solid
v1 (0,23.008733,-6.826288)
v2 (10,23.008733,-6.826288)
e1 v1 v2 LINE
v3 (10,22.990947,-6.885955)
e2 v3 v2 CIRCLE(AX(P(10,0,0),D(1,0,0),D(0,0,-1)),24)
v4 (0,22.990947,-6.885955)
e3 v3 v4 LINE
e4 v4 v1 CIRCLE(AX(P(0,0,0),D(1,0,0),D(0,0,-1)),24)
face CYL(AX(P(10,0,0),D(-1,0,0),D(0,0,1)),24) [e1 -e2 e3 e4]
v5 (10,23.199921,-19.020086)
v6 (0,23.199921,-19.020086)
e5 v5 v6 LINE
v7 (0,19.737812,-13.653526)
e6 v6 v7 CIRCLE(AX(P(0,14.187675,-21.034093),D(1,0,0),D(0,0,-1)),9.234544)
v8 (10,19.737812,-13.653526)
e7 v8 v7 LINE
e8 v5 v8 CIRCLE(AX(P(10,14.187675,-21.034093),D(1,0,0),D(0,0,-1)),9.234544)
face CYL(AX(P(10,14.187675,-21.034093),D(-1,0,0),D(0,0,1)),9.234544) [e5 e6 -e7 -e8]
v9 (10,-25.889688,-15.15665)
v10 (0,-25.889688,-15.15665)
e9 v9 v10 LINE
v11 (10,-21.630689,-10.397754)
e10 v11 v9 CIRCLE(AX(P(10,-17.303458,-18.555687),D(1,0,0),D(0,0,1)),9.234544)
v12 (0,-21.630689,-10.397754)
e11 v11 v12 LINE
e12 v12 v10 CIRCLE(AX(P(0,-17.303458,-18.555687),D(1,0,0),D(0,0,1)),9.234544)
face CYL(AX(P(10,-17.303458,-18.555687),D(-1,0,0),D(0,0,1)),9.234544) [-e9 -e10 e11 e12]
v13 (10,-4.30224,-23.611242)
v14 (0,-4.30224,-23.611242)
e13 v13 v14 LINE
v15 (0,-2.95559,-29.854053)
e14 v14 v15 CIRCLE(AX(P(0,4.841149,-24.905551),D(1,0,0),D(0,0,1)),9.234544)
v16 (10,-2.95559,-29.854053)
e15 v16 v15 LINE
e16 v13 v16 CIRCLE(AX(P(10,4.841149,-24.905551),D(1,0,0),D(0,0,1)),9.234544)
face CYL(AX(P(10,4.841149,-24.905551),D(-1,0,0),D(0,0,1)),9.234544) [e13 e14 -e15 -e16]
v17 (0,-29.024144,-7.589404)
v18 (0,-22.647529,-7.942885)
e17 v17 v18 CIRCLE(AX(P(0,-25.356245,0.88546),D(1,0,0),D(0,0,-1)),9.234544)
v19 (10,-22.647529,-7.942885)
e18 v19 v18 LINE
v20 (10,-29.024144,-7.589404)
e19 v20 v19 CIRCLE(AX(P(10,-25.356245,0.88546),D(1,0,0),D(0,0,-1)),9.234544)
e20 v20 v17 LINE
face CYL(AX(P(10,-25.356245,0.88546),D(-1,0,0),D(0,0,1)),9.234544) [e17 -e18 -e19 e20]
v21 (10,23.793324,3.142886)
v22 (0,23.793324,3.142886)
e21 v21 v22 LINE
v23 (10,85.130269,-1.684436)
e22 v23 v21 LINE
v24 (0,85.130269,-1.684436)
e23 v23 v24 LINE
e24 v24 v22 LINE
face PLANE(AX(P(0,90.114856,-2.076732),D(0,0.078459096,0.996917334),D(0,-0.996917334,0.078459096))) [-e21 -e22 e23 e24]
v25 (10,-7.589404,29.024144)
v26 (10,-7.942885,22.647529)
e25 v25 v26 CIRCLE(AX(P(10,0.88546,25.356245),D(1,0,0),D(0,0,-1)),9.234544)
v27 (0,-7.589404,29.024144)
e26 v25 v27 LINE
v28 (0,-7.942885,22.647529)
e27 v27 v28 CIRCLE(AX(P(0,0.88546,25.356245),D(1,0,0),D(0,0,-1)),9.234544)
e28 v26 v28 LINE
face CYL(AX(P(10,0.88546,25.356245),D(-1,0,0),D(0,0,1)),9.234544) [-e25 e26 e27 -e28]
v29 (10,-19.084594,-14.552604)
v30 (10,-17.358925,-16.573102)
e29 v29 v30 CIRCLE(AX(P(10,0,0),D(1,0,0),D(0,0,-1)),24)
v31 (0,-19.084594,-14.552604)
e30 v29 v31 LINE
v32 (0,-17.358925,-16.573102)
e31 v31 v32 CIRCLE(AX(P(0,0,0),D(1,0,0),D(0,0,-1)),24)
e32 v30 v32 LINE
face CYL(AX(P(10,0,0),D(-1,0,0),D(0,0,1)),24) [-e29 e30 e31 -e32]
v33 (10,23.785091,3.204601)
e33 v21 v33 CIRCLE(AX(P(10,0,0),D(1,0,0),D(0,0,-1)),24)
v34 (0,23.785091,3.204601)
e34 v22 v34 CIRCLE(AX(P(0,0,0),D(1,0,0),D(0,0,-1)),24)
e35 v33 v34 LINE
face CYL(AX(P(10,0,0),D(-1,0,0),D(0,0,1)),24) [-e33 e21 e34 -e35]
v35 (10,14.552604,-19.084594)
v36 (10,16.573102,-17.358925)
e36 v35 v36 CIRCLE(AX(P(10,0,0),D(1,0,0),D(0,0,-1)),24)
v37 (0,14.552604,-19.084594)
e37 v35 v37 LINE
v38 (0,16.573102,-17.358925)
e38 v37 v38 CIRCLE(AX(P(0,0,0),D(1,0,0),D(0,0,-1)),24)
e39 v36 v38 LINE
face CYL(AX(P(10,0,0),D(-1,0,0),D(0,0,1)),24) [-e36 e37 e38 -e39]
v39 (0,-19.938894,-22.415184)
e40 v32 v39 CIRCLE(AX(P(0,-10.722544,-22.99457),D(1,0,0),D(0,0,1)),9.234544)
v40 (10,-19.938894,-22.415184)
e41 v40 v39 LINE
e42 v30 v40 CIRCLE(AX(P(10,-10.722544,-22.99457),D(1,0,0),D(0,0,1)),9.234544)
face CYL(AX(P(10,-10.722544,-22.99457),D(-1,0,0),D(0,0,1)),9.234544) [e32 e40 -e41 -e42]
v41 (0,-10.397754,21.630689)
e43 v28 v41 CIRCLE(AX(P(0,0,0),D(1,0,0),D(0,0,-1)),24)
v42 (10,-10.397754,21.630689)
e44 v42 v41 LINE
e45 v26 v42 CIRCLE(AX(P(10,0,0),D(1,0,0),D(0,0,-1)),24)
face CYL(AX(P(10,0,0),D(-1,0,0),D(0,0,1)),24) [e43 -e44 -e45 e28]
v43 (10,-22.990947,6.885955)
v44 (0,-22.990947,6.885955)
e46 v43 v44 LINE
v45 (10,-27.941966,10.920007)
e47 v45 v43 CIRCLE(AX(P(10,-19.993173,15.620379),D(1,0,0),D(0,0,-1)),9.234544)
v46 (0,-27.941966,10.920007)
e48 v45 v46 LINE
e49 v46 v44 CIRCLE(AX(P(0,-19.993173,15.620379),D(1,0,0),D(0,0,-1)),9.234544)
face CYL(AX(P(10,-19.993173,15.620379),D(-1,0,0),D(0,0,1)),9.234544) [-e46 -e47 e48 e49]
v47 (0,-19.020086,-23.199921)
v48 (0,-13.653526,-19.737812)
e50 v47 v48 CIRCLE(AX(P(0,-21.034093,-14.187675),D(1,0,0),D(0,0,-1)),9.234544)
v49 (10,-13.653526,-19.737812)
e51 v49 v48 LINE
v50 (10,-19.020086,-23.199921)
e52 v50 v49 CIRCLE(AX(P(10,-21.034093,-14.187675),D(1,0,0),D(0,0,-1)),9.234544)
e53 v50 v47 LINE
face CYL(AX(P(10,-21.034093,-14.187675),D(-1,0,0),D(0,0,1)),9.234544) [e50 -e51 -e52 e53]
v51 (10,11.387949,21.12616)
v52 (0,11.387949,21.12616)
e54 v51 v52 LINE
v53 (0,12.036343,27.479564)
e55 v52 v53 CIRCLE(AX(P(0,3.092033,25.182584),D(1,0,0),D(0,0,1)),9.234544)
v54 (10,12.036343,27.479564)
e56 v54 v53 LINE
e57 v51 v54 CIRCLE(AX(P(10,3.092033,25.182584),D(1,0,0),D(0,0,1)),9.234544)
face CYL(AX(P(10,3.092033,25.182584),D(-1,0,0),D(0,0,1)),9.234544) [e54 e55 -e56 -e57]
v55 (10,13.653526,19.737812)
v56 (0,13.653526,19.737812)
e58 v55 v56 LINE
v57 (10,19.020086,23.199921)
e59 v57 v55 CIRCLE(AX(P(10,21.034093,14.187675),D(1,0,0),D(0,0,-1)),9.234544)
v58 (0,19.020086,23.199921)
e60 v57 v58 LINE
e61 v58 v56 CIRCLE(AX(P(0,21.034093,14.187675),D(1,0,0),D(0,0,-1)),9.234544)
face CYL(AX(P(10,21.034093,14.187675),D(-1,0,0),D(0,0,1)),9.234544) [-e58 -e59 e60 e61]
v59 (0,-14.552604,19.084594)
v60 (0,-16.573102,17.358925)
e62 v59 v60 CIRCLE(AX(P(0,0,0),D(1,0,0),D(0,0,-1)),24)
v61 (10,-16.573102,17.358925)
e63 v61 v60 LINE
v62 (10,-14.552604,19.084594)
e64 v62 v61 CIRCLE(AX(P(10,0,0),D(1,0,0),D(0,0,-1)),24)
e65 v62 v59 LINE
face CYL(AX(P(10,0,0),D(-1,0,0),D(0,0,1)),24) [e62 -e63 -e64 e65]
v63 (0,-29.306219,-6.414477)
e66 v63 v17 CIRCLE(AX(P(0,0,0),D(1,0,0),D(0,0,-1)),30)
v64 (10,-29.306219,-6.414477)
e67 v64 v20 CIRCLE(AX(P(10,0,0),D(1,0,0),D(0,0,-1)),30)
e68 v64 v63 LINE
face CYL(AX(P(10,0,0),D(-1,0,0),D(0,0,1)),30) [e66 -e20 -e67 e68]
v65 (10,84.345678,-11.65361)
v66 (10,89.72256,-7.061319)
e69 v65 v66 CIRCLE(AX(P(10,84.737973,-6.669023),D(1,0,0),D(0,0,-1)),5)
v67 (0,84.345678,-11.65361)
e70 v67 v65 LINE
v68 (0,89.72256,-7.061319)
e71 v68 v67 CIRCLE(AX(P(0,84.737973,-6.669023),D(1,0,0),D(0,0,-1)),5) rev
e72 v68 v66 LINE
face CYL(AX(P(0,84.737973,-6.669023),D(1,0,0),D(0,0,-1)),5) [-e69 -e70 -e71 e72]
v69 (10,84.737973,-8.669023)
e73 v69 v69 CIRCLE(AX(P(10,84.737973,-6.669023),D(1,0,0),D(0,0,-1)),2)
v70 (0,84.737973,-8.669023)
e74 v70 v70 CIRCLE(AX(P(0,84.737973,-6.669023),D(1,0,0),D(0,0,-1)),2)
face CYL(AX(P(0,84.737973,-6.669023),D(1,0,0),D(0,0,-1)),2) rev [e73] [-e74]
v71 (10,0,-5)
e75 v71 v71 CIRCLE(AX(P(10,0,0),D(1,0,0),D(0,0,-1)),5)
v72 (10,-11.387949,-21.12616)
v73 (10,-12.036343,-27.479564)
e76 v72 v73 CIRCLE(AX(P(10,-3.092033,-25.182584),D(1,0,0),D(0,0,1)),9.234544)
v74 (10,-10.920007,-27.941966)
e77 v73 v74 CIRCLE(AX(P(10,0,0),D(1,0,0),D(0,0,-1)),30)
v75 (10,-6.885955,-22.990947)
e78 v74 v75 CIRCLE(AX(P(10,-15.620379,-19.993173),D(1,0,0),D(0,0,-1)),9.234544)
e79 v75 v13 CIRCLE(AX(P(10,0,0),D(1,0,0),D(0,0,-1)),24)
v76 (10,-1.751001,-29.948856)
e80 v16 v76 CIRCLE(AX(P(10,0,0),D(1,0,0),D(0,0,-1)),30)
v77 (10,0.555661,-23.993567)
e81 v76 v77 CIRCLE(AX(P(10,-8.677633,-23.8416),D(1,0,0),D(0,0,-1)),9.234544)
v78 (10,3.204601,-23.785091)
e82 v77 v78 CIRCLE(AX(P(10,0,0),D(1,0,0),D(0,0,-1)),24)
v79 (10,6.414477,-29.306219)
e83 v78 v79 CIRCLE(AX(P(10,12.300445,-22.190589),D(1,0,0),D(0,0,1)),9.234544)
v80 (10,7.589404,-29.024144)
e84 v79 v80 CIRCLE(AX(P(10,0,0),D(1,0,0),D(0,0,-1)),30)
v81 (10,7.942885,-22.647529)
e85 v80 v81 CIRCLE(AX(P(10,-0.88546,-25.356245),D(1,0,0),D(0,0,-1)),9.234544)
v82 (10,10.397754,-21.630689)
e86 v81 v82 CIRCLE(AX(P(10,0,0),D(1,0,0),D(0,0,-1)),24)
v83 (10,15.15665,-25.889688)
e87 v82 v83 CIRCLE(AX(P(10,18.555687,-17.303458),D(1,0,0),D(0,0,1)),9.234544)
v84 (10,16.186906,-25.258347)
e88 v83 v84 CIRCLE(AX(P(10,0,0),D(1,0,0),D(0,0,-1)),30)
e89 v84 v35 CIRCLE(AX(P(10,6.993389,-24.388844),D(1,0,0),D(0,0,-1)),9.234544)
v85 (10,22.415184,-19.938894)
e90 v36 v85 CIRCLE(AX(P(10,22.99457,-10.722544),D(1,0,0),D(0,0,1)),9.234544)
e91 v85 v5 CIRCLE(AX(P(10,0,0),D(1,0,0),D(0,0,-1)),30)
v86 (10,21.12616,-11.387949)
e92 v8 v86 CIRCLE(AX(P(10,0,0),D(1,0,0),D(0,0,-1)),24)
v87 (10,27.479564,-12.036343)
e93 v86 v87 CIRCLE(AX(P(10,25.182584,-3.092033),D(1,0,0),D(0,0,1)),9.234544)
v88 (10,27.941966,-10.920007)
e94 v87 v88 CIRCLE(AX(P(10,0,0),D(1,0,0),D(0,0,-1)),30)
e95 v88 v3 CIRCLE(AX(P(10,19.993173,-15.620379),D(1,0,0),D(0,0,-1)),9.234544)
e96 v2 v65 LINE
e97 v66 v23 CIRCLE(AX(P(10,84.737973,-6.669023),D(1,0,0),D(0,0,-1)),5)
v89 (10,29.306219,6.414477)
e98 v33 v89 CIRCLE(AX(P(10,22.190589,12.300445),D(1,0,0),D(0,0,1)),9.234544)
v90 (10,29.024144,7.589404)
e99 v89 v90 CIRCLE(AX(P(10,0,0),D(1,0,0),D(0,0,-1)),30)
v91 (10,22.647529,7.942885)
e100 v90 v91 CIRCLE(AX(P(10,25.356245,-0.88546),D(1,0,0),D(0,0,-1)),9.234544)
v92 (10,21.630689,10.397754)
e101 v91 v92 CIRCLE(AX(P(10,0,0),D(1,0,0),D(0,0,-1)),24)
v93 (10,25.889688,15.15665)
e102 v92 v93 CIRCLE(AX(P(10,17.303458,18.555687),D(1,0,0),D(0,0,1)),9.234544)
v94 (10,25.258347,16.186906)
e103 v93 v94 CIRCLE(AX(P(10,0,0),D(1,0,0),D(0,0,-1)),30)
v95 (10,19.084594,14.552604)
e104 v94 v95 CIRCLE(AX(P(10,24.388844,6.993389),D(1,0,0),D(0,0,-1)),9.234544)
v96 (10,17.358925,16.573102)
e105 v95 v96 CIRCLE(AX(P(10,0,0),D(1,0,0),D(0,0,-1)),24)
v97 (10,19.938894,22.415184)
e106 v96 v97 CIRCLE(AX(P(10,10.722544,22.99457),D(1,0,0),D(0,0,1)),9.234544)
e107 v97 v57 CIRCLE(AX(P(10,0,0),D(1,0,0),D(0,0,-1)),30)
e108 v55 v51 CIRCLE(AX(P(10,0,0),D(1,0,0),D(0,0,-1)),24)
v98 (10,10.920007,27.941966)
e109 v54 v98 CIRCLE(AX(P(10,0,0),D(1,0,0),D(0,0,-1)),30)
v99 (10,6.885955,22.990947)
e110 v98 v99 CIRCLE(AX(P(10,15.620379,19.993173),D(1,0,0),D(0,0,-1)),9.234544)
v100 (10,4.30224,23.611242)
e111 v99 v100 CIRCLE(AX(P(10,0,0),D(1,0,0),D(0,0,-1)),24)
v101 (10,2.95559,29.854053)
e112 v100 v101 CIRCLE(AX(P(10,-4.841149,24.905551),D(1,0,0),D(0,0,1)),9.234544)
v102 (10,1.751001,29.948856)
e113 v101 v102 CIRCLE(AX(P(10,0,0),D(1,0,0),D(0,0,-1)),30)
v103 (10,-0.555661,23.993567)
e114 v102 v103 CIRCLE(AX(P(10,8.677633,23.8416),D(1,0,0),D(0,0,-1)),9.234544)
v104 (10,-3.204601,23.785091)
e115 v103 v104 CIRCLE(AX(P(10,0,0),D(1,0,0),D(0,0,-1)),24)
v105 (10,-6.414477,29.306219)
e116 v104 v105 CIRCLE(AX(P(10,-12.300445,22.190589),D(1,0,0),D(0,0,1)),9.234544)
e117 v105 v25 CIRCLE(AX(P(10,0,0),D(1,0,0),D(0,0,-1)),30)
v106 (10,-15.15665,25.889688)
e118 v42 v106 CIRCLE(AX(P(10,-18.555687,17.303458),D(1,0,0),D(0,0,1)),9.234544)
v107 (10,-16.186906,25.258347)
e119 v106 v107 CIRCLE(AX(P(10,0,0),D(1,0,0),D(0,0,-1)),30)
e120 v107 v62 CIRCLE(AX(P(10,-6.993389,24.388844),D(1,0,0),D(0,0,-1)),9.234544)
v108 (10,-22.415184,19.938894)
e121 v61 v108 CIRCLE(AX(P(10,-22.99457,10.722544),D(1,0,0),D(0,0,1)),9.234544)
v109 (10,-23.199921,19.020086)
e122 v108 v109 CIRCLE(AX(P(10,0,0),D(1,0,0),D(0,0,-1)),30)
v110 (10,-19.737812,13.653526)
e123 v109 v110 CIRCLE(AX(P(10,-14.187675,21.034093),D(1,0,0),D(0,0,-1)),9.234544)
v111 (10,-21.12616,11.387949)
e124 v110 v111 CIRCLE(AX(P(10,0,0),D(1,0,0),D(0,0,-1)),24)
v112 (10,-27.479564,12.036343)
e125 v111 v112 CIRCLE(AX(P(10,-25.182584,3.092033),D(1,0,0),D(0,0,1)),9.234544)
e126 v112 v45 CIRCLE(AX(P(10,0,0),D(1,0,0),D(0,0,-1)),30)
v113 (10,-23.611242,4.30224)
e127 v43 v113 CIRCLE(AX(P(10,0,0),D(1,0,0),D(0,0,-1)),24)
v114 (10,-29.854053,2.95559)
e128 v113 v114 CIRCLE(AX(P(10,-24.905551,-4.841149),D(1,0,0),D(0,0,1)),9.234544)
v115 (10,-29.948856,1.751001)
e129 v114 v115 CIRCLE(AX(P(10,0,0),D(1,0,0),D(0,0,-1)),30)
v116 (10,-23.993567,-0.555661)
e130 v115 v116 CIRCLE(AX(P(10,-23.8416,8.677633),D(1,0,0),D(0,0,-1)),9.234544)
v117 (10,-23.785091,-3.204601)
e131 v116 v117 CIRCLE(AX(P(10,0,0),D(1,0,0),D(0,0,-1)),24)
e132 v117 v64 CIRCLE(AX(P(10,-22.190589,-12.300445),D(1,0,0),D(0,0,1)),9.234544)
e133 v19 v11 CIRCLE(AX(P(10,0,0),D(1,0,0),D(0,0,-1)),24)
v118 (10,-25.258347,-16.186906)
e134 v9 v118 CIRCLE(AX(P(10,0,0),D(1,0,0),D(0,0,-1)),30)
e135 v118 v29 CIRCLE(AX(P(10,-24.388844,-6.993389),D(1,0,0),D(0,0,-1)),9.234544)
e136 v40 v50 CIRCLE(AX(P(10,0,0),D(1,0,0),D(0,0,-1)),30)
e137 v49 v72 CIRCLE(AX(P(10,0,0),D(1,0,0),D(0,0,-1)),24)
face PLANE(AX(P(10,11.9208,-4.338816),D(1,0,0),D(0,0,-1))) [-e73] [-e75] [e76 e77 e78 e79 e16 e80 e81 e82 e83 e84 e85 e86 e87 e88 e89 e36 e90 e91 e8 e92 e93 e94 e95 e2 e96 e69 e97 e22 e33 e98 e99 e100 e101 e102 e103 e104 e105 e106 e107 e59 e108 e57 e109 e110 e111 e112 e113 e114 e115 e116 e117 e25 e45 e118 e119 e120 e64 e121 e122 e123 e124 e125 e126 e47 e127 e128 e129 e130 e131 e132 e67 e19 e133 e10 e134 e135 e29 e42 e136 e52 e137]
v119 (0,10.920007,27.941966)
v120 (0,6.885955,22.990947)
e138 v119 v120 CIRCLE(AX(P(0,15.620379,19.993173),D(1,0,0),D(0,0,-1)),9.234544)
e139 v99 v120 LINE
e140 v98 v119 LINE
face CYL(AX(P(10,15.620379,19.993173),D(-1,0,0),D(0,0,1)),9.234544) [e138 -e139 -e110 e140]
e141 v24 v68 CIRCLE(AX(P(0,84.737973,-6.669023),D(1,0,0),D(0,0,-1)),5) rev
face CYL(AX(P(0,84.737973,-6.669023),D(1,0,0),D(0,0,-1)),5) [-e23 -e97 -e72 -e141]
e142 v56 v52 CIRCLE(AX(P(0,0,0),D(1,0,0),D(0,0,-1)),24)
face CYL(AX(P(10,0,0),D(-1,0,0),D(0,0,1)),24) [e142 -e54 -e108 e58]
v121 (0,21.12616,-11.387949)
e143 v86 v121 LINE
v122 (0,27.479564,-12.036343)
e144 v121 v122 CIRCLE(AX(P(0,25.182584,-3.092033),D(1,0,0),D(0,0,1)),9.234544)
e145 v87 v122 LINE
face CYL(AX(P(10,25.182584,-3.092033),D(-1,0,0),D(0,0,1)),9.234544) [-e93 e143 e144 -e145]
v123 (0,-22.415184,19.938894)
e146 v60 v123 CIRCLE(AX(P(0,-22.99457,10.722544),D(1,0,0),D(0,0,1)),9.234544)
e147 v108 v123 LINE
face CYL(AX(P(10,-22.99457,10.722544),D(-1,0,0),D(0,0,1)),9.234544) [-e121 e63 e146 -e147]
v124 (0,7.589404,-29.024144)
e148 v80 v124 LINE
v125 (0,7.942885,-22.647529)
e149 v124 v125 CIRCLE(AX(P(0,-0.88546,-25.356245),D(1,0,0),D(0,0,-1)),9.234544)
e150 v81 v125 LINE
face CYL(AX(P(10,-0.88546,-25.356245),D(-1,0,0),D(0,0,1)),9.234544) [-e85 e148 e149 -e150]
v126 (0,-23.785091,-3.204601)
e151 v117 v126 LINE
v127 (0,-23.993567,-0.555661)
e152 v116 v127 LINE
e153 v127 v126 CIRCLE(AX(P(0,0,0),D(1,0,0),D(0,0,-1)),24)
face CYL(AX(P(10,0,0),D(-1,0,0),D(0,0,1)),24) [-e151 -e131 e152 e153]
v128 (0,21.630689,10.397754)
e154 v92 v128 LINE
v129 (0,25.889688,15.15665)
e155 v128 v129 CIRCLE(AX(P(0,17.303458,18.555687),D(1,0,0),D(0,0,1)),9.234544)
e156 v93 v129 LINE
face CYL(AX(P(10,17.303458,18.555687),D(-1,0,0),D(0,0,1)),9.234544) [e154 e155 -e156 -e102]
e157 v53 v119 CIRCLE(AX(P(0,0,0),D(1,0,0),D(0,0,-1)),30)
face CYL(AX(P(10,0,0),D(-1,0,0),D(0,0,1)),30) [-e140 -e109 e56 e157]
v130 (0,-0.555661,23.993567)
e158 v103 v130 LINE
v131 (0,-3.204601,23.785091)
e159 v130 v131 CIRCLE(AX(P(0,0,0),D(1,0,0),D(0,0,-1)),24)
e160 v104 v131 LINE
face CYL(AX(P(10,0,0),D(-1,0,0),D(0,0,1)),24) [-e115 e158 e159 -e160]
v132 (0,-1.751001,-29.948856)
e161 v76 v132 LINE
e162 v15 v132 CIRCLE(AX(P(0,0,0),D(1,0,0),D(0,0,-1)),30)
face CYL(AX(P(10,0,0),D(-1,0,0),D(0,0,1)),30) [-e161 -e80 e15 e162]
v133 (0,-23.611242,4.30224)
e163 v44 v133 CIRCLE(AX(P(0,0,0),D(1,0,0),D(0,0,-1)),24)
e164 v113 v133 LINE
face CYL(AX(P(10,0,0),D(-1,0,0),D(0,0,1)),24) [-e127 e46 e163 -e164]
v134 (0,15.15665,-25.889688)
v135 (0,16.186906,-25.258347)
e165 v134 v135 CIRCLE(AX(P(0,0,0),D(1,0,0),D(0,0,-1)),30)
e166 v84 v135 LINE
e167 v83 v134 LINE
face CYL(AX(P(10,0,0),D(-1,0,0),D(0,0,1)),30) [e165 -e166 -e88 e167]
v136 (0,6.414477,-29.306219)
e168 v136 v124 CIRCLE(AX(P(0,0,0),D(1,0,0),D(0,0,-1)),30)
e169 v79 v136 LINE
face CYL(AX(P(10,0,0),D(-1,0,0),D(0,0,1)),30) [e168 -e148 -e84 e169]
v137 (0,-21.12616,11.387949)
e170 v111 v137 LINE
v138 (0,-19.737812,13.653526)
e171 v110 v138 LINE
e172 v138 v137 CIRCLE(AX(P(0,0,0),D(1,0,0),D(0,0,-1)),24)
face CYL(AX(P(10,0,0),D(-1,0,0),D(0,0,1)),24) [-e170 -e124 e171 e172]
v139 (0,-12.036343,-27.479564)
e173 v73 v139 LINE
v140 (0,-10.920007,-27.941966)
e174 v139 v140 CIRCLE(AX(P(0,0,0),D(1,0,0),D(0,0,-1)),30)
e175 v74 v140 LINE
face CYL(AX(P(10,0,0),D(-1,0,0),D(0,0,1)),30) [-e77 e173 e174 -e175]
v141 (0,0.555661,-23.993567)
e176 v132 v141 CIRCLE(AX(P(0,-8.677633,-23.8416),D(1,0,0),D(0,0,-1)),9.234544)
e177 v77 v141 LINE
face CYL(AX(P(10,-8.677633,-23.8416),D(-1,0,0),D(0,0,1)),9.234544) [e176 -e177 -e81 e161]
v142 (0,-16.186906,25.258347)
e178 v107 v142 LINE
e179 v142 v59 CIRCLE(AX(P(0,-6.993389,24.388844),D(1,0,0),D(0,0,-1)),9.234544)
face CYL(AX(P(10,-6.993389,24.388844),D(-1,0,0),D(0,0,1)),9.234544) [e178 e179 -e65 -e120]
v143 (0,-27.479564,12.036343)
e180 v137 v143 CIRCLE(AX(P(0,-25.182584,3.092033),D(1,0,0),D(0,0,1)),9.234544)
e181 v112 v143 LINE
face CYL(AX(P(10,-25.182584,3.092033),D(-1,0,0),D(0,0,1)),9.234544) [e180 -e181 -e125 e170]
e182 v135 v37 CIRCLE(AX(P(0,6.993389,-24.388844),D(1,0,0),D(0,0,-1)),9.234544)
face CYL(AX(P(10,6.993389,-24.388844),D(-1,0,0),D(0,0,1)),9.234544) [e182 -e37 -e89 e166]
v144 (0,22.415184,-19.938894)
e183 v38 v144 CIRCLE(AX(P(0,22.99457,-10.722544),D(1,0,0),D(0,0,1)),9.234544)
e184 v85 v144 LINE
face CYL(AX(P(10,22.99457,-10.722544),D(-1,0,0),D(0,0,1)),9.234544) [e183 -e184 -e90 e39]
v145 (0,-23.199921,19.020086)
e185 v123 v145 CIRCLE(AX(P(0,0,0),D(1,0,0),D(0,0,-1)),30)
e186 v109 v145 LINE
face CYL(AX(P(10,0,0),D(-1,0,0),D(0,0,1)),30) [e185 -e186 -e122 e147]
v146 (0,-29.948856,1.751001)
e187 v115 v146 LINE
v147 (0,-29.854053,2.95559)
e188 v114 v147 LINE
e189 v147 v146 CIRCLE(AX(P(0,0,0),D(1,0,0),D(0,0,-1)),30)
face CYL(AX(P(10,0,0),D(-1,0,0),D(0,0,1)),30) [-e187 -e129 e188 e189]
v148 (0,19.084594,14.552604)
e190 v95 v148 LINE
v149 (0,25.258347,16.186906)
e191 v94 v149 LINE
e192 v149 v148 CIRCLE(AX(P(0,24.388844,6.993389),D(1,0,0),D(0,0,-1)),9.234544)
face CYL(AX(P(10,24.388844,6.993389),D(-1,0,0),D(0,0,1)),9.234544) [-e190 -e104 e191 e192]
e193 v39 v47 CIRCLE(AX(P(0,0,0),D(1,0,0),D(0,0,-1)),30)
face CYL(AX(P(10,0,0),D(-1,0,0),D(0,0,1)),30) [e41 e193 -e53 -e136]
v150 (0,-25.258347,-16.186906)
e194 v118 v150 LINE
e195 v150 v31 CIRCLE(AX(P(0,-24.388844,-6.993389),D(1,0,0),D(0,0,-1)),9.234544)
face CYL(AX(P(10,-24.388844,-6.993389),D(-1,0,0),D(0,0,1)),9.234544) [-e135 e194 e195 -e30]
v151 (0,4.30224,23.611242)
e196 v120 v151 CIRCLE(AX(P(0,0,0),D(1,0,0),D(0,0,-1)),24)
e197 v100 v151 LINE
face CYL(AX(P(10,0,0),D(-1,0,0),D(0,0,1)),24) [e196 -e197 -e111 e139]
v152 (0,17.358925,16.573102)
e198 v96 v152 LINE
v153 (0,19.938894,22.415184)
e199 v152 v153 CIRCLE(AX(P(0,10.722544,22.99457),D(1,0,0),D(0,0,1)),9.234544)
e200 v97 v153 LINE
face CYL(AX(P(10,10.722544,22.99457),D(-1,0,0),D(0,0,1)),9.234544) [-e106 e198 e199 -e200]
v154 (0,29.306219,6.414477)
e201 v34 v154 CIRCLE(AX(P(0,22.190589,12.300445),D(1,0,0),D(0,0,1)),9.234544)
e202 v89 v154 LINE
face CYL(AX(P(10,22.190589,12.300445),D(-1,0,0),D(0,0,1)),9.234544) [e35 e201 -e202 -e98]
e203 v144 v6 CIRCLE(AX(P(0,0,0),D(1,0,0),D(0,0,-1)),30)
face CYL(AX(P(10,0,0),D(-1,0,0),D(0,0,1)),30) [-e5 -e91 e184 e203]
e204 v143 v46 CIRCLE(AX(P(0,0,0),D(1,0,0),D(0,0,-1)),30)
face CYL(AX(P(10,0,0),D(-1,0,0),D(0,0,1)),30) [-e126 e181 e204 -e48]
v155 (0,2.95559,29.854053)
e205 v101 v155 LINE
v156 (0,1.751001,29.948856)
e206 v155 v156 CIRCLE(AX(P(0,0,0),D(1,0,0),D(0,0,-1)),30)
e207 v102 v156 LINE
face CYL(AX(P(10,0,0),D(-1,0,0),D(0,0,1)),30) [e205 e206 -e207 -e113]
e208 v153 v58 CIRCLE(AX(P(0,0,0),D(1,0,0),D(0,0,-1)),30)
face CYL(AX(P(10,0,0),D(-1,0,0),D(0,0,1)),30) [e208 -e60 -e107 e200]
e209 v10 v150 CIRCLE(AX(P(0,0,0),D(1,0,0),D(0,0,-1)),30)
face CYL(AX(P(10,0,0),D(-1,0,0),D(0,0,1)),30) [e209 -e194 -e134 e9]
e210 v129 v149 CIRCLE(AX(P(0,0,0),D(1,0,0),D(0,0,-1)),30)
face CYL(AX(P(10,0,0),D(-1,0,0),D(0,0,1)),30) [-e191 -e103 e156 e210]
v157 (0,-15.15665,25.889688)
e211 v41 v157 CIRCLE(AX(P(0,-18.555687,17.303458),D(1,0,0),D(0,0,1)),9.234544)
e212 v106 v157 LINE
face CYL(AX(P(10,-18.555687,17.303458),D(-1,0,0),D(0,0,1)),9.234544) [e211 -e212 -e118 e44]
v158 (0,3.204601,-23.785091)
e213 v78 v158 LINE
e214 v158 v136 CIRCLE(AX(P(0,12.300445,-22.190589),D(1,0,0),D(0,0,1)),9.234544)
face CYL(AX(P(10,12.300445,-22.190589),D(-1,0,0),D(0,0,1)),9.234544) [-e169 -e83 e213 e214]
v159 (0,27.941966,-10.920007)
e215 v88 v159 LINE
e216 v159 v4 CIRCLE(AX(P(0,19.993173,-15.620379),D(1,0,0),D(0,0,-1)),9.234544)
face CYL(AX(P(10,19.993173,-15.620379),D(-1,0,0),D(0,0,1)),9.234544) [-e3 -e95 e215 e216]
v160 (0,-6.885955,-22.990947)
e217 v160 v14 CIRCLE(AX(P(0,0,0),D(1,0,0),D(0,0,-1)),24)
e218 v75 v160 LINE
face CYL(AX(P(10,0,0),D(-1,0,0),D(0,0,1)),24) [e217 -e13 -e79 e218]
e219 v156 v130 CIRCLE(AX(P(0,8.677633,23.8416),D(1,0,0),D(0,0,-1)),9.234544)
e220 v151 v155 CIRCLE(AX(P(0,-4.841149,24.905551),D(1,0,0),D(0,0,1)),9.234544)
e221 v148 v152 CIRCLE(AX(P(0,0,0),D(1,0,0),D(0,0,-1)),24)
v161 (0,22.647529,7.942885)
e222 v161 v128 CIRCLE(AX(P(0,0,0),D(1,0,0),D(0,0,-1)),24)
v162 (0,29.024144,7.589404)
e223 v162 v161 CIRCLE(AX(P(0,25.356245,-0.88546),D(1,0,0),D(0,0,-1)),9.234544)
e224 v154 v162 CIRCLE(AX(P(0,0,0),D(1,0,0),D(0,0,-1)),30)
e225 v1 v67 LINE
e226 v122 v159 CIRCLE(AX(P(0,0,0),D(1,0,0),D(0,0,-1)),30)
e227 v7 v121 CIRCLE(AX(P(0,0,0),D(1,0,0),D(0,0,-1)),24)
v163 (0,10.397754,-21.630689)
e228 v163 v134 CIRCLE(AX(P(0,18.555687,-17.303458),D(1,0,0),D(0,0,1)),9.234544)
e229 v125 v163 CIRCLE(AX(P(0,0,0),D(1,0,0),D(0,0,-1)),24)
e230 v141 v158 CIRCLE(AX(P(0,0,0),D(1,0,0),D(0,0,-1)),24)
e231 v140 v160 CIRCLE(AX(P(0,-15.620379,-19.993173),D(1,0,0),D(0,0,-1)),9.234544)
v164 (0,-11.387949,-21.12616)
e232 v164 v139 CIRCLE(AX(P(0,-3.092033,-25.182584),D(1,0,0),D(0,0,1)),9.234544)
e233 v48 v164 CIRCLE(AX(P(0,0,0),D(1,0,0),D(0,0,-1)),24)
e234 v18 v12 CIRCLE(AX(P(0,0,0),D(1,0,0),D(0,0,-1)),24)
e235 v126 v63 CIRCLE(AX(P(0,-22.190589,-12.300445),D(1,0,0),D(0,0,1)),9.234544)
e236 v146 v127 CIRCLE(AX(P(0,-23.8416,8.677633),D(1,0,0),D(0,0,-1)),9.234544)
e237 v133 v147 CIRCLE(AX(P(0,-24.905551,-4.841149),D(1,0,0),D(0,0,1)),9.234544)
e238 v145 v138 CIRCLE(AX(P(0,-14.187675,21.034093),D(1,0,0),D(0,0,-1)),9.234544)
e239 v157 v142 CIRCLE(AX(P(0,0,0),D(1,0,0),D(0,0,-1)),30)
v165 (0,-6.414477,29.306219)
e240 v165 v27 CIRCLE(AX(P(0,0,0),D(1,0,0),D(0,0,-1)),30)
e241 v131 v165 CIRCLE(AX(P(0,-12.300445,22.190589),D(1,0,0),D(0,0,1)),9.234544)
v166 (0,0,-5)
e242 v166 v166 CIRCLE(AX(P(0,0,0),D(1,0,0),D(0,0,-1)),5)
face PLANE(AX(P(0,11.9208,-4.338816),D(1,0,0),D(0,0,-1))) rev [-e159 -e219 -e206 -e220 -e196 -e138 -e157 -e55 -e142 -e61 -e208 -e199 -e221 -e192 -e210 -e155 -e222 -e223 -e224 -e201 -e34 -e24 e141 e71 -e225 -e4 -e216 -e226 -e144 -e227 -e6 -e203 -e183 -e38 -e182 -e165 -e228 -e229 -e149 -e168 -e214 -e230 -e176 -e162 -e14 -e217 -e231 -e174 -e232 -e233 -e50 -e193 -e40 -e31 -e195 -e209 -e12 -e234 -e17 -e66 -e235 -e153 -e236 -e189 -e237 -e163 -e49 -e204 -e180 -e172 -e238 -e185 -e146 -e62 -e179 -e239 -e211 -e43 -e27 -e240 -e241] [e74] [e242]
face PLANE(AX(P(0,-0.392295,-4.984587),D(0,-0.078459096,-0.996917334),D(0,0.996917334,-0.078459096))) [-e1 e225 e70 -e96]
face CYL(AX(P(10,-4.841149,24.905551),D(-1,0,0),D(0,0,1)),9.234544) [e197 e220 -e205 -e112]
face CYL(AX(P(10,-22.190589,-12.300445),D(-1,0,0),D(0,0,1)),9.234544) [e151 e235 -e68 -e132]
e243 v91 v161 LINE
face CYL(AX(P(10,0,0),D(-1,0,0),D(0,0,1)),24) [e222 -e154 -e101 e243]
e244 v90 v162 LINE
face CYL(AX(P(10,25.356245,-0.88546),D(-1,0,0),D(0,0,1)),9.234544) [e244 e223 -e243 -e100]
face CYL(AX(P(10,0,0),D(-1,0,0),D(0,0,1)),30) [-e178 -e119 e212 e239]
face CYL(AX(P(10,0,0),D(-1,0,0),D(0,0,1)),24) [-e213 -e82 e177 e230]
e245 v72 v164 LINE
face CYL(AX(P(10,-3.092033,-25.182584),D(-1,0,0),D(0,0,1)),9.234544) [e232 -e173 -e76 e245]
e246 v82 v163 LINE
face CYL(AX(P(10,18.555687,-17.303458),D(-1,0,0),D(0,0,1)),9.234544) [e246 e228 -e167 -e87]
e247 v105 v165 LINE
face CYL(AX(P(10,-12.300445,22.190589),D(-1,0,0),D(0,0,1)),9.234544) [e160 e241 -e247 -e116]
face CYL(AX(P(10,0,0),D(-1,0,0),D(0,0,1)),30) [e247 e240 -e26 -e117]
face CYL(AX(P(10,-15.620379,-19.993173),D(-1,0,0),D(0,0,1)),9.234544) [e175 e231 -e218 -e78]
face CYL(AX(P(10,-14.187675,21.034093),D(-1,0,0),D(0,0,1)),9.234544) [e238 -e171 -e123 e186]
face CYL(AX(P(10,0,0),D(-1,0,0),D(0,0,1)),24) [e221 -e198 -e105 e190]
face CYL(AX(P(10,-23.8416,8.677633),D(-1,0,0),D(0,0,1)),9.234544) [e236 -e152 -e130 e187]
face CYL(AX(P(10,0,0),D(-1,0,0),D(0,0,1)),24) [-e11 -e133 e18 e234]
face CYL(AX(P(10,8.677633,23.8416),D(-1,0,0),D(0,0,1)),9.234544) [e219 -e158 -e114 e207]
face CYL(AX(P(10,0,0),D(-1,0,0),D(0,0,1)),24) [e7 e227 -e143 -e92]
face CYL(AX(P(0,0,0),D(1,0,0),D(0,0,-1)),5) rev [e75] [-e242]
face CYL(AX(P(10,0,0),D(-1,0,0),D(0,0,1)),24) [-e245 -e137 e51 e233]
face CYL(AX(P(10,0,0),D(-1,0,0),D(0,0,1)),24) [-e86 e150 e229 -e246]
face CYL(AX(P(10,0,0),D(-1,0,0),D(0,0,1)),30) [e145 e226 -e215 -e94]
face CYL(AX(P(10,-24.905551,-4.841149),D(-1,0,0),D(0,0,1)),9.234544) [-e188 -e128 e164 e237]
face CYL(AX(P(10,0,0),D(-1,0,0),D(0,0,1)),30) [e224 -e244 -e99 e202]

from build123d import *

# Parameters (mm, degrees)
EXTRUDE_1_DEPTH     = 10
EXTRUDE_2_DEPTH     = 10
FILLET_1_R          = 5
SKETCH_3_R          = 5
CUT_EXTRUDE_1_DEPTH = 10
SKETCH_4_R          = 2
CUT_EXTRUDE_2_DEPTH = 10


with BuildPart() as part:
    # 草图1 → 凸台-拉伸1 (new body)
    with BuildSketch(Plane(origin=(0, 0, 0), x_dir=(0, 0, -1), z_dir=(1, 0, 0))):
        with BuildLine():
            ThreePointArc((-7.942884534, 22.647529341), (-9.184402377, 22.17310878), (-10.397754058, 21.630689091))
            ThreePointArc((-10.397754058, 21.630689091), (-12.397305949, 24.184674774), (-15.156649968, 25.889688329))
            ThreePointArc((-15.156649968, 25.889688329), (-15.674956941, 25.579204931), (-16.186906117, 25.258346549))
            ThreePointArc((-16.186906117, 25.258346549), (-15.920443886, 22.02569307), (-14.552603542, 19.084594053))
            ThreePointArc((-14.552603542, 19.084594053), (-15.58675316, 18.249743174), (-16.573102281, 17.358925105))
            ThreePointArc((-16.573102281, 17.358925105), (-19.264014116, 19.170014316), (-22.41518439, 19.938894372))
            ThreePointArc((-22.41518439, 19.938894372), (-22.812178968, 19.48344145), (-23.199920874, 19.020085999))
            ThreePointArc((-23.199920874, 19.020085999), (-21.947555371, 16.027991201), (-19.737812321, 13.653525728))
            ThreePointArc((-19.737812321, 13.653525728), (-20.463363944, 12.539965553), (-21.126159781, 11.387948582))
            ThreePointArc((-21.126159781, 11.387948582), (-24.245026361, 12.278859291), (-27.479564388, 12.036342512))
            ThreePointArc((-27.479564388, 12.036342512), (-27.716385975, 11.480502971), (-27.941965733, 10.920006912))
            ThreePointArc((-27.941965733, 10.920006912), (-25.82628722, 8.46135788), (-22.990946508, 6.885955175))
            ThreePointArc((-22.990946508, 6.885955175), (-23.33687809, 5.602688733), (-23.611241567, 4.302240308))
            ThreePointArc((-23.611241567, 4.302240308), (-26.852766501, 4.185763967), (-29.854053162, 2.955589584))
            ThreePointArc((-29.854053162, 2.955589584), (-29.907520012, 2.353772872), (-29.948856303, 1.751001464))
            ThreePointArc((-29.948856303, 1.751001464), (-27.176962132, 0.066467896), (-23.993566664, -0.555660648))
            ThreePointArc((-23.993566664, -0.555660648), (-23.92601601, -1.883018297), (-23.785090519, -3.204601222))
            ThreePointArc((-23.785090519, -3.204601222), (-26.831970761, -4.317063099), (-29.306219208, -6.414477044))
            ThreePointArc((-29.306219208, -6.414477044), (-29.171097612, -7.003360916), (-29.024144152, -7.589404208))
            ThreePointArc((-29.024144152, -7.589404208), (-25.867366639, -8.334928429), (-22.647529341, -7.942884534))
            ThreePointArc((-22.647529341, -7.942884534), (-22.17310878, -9.184402377), (-21.630689091, -10.397754058))
            ThreePointArc((-21.630689091, -10.397754058), (-24.184674774, -12.397305949), (-25.889688329, -15.156649968))
            ThreePointArc((-25.889688329, -15.156649968), (-25.579204931, -15.674956941), (-25.258346549, -16.186906117))
            ThreePointArc((-25.258346549, -16.186906117), (-22.02569307, -15.920443886), (-19.084594053, -14.552603542))
            ThreePointArc((-19.084594053, -14.552603542), (-18.249743174, -15.58675316), (-17.358925105, -16.573102281))
            ThreePointArc((-17.358925105, -16.573102281), (-19.170014316, -19.264014116), (-19.938894372, -22.41518439))
            ThreePointArc((-19.938894372, -22.41518439), (-19.48344145, -22.812178968), (-19.020085999, -23.199920874))
            ThreePointArc((-19.020085999, -23.199920874), (-16.027991201, -21.947555371), (-13.653525728, -19.737812321))
            ThreePointArc((-13.653525728, -19.737812321), (-12.539965553, -20.463363944), (-11.387948582, -21.126159781))
            ThreePointArc((-11.387948582, -21.126159781), (-12.278859291, -24.245026361), (-12.036342512, -27.479564388))
            ThreePointArc((-12.036342512, -27.479564388), (-11.480502971, -27.716385975), (-10.920006912, -27.941965733))
            ThreePointArc((-10.920006912, -27.941965733), (-8.46135788, -25.82628722), (-6.885955175, -22.990946508))
            ThreePointArc((-6.885955175, -22.990946508), (-5.602688733, -23.33687809), (-4.302240308, -23.611241567))
            ThreePointArc((-4.302240308, -23.611241567), (-4.185763967, -26.852766501), (-2.955589584, -29.854053162))
            ThreePointArc((-2.955589584, -29.854053162), (-2.353772872, -29.907520012), (-1.751001464, -29.948856303))
            ThreePointArc((-1.751001464, -29.948856303), (-0.066467896, -27.176962132), (0.555660648, -23.993566664))
            ThreePointArc((0.555660648, -23.993566664), (1.883018297, -23.92601601), (3.204601222, -23.785090519))
            ThreePointArc((3.204601222, -23.785090519), (4.317063099, -26.831970761), (6.414477044, -29.306219208))
            ThreePointArc((6.414477044, -29.306219208), (7.003360916, -29.171097612), (7.589404208, -29.024144152))
            ThreePointArc((7.589404208, -29.024144152), (8.334928429, -25.867366639), (7.942884534, -22.647529341))
            ThreePointArc((7.942884534, -22.647529341), (9.184402377, -22.17310878), (10.397754058, -21.630689091))
            ThreePointArc((10.397754058, -21.630689091), (12.397305949, -24.184674774), (15.156649968, -25.889688329))
            ThreePointArc((15.156649968, -25.889688329), (15.674956941, -25.579204931), (16.186906117, -25.258346549))
            ThreePointArc((16.186906117, -25.258346549), (15.920443886, -22.02569307), (14.552603542, -19.084594053))
            ThreePointArc((14.552603542, -19.084594053), (15.58675316, -18.249743174), (16.573102281, -17.358925105))
            ThreePointArc((16.573102281, -17.358925105), (19.264014116, -19.170014316), (22.41518439, -19.938894372))
            ThreePointArc((22.41518439, -19.938894372), (22.812178968, -19.48344145), (23.199920874, -19.020085999))
            ThreePointArc((23.199920874, -19.020085999), (21.947555371, -16.027991201), (19.737812321, -13.653525728))
            ThreePointArc((19.737812321, -13.653525728), (20.463363944, -12.539965553), (21.126159781, -11.387948582))
            ThreePointArc((21.126159781, -11.387948582), (24.245026361, -12.278859291), (27.479564388, -12.036342512))
            ThreePointArc((27.479564388, -12.036342512), (27.716385975, -11.480502971), (27.941965733, -10.920006912))
            ThreePointArc((27.941965733, -10.920006912), (25.82628722, -8.46135788), (22.990946508, -6.885955175))
            ThreePointArc((22.990946508, -6.885955175), (23.33687809, -5.602688733), (23.611241567, -4.302240308))
            ThreePointArc((23.611241567, -4.302240308), (26.852766501, -4.185763967), (29.854053162, -2.955589584))
            ThreePointArc((29.854053162, -2.955589584), (29.907520012, -2.353772872), (29.948856303, -1.751001464))
            ThreePointArc((29.948856303, -1.751001464), (27.176962132, -0.066467896), (23.993566664, 0.555660648))
            ThreePointArc((23.993566664, 0.555660648), (23.92601601, 1.883018297), (23.785090519, 3.204601222))
            ThreePointArc((23.785090519, 3.204601222), (26.831970761, 4.317063099), (29.306219208, 6.414477044))
            ThreePointArc((29.306219208, 6.414477044), (29.171097612, 7.003360916), (29.024144152, 7.589404208))
            ThreePointArc((29.024144152, 7.589404208), (25.867366639, 8.334928429), (22.647529341, 7.942884534))
            ThreePointArc((22.647529341, 7.942884534), (22.17310878, 9.184402377), (21.630689091, 10.397754058))
            ThreePointArc((21.630689091, 10.397754058), (24.184674774, 12.397305949), (25.889688329, 15.156649968))
            ThreePointArc((25.889688329, 15.156649968), (25.579204931, 15.674956941), (25.258346549, 16.186906117))
            ThreePointArc((25.258346549, 16.186906117), (22.02569307, 15.920443886), (19.084594053, 14.552603542))
            ThreePointArc((19.084594053, 14.552603542), (18.249743174, 15.58675316), (17.358925105, 16.573102281))
            ThreePointArc((17.358925105, 16.573102281), (19.170014316, 19.264014116), (19.938894372, 22.41518439))
            ThreePointArc((19.938894372, 22.41518439), (19.48344145, 22.812178968), (19.020085999, 23.199920874))
            ThreePointArc((19.020085999, 23.199920874), (16.027991201, 21.947555371), (13.653525728, 19.737812321))
            ThreePointArc((13.653525728, 19.737812321), (12.539965553, 20.463363944), (11.387948582, 21.126159781))
            ThreePointArc((11.387948582, 21.126159781), (12.278859291, 24.245026361), (12.036342512, 27.479564388))
            ThreePointArc((12.036342512, 27.479564388), (11.480502971, 27.716385975), (10.920006912, 27.941965733))
            ThreePointArc((10.920006912, 27.941965733), (8.46135788, 25.82628722), (6.885955175, 22.990946508))
            ThreePointArc((6.885955175, 22.990946508), (5.602688733, 23.33687809), (4.302240308, 23.611241567))
            ThreePointArc((4.302240308, 23.611241567), (4.185763967, 26.852766501), (2.955589584, 29.854053162))
            ThreePointArc((2.955589584, 29.854053162), (2.353772872, 29.907520012), (1.751001464, 29.948856303))
            ThreePointArc((1.751001464, 29.948856303), (0.066467896, 27.176962132), (-0.555660648, 23.993566664))
            ThreePointArc((-0.555660648, 23.993566664), (-1.883018297, 23.92601601), (-3.204601222, 23.785090519))
            ThreePointArc((-3.204601222, 23.785090519), (-4.317063099, 26.831970761), (-6.414477044, 29.306219208))
            ThreePointArc((-6.414477044, 29.306219208), (-7.003360916, 29.171097612), (-7.589404208, 29.024144152))
            ThreePointArc((-7.589404208, 29.024144152), (-8.334928429, 25.867366639), (-7.942884534, 22.647529341))
        make_face()
    extrude(amount=EXTRUDE_1_DEPTH)

    # 草图2 → 凸台-拉伸2 (add)
    with BuildSketch(Plane(origin=(10, 0, 0), x_dir=(0, 0, -1), z_dir=(1, 0, 0))):
        Polygon((2.076731947, 90.114855515), (-4.984586669, 0.392295479), (4.984586669, -0.392295479), (12.045905284, 89.330264557), align=None)
    extrude(amount=-EXTRUDE_2_DEPTH)

    # 圆角1
    fillet_1_edges = [part.edges().sort_by_distance(p)[0] for p in [
        (5, 89.330264557, -12.045905284),
        (5, 90.114855515, -2.076731947),
    ]]
    fillet(fillet_1_edges, radius=FILLET_1_R - 0.0001)  # a hair under: the kernel refuses the full size

    # 草图3 → 切除-拉伸1 (cut)
    with BuildSketch(Plane(origin=(10, 0, 0), x_dir=(0, 0, -1), z_dir=(1, 0, 0))):
        Circle(SKETCH_3_R)
    extrude(amount=-CUT_EXTRUDE_1_DEPTH, mode=Mode.SUBTRACT)

    # 草图4 → 切除-拉伸2 (cut)
    with BuildSketch(Plane(origin=(10, 0, 0), x_dir=(0, 0, -1), z_dir=(1, 0, 0))):
        with Locations((6.669023137, 84.737973367)):
            Circle(SKETCH_4_R)
    extrude(amount=-CUT_EXTRUDE_2_DEPTH, mode=Mode.SUBTRACT)


solid = part.part
